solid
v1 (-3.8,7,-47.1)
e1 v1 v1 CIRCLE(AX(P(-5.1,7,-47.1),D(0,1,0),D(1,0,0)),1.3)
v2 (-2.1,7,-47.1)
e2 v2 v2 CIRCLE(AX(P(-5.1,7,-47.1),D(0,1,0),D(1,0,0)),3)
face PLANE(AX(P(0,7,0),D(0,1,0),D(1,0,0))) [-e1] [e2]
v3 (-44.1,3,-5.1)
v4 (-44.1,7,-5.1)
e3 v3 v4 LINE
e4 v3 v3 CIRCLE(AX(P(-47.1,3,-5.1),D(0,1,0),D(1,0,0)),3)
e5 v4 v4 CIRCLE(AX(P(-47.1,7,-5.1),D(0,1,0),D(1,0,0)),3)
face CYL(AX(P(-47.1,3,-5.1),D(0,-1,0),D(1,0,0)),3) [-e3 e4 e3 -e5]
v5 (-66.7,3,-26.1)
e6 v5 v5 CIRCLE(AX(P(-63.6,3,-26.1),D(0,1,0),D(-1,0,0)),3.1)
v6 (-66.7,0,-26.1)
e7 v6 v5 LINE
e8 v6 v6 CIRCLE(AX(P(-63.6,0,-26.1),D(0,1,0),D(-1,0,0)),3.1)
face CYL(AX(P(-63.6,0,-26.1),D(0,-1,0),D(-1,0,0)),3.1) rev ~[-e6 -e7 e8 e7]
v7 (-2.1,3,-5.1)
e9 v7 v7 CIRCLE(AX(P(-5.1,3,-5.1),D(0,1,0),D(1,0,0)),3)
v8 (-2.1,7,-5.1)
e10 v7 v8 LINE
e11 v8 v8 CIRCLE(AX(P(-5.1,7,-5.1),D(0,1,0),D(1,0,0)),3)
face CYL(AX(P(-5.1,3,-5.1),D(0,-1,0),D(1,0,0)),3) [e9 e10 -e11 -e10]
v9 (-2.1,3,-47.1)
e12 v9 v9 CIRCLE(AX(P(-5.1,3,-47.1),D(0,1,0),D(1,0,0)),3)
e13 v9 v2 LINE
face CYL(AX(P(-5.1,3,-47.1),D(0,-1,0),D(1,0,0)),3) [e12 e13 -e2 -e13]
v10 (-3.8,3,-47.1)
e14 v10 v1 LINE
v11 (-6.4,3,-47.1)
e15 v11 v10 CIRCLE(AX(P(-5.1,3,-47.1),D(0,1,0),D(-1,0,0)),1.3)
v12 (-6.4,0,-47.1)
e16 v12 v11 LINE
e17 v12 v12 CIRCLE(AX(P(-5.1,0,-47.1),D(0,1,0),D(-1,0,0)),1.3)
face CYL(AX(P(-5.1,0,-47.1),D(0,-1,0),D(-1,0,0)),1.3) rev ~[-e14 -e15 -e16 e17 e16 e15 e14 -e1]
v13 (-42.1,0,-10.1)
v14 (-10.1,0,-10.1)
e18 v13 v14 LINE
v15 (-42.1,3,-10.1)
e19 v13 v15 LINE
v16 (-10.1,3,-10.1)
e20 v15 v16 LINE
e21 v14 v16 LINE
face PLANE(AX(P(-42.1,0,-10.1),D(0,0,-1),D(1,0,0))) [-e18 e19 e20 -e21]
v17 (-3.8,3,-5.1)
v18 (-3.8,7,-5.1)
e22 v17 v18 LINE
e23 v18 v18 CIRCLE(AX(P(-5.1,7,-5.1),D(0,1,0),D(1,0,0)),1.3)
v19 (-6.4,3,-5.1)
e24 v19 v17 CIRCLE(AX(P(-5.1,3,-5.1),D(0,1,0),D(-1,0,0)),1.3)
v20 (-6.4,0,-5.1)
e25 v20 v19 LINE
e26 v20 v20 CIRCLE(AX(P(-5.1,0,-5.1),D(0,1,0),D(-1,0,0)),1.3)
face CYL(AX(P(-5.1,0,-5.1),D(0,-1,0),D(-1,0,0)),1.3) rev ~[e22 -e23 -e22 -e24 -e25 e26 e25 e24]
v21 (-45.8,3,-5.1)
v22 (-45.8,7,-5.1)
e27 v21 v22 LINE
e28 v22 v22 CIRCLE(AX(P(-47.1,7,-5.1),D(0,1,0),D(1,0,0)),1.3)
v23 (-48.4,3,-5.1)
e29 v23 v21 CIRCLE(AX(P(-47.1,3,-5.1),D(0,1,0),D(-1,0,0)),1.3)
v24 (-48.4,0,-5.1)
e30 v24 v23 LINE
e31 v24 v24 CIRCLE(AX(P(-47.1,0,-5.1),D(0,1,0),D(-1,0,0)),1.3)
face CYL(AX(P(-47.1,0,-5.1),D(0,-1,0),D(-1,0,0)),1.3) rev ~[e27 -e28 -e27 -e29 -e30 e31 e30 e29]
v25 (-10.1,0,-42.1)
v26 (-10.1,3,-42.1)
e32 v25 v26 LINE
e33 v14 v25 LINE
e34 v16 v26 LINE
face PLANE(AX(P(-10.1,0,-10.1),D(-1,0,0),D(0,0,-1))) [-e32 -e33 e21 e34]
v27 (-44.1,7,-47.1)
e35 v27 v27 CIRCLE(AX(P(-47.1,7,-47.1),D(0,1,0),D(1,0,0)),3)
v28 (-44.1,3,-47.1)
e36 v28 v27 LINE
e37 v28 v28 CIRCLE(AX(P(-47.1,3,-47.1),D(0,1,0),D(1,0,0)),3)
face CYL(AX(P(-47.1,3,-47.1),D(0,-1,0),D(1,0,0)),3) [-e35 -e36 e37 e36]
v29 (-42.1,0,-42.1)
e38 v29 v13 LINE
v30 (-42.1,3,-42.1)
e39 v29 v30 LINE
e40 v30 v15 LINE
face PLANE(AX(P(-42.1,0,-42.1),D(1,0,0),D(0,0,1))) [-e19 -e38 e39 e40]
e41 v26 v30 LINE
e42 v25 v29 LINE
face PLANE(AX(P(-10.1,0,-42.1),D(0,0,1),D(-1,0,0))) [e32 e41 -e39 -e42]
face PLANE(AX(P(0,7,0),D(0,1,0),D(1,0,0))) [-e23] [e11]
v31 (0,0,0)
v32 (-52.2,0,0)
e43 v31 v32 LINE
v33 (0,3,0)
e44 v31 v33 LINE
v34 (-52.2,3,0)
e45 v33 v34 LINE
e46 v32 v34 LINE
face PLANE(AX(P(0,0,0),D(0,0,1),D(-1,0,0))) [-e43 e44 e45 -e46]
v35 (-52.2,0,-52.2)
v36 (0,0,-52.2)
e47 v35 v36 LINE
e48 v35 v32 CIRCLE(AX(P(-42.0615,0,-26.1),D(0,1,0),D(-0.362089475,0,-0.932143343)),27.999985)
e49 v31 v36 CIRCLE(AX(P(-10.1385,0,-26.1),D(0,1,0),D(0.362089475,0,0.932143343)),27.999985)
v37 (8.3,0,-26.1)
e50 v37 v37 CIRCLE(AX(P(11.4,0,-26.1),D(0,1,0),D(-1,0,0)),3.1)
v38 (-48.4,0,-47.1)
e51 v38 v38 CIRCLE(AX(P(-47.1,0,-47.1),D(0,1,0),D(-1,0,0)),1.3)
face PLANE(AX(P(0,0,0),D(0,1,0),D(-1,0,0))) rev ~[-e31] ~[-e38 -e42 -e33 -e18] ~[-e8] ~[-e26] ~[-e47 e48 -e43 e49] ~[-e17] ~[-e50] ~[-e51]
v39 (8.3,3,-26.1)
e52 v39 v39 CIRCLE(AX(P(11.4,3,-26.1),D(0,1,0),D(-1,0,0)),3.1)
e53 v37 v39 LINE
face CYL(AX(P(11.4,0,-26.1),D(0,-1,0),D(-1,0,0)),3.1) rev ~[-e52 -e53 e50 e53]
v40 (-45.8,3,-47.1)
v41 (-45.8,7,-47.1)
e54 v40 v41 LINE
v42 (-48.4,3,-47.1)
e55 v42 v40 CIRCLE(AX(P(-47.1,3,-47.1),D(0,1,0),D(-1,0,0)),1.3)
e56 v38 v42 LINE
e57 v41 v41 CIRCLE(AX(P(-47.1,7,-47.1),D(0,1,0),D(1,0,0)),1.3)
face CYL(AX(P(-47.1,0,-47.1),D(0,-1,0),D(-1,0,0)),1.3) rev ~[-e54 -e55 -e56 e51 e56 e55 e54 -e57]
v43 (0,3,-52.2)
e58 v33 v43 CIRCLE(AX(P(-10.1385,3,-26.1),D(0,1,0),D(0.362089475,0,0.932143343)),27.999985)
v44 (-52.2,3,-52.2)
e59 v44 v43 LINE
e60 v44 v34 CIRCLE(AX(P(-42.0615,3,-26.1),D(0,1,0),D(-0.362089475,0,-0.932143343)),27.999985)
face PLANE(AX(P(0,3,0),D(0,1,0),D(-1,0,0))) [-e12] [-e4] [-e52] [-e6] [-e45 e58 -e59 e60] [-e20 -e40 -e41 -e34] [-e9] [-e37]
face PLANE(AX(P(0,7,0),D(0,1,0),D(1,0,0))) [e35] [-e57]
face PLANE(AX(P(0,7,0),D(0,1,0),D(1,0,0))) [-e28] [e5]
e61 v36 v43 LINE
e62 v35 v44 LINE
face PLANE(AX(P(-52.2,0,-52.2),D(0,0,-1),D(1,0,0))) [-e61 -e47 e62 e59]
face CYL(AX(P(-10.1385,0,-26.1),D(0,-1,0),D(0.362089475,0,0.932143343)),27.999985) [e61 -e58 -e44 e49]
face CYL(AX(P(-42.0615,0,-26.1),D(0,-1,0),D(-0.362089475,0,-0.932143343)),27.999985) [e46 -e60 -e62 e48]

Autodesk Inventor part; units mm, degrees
ref_plane "YZ Plane" through (0, 0, 0) normal (1, 0, 0) x (0, 1, 0)
ref_plane "XZ Plane" through (0, 0, 0) normal (0, 1, 0) x (-1, 0, 0)
ref_plane "XY Plane" through (0, 0, 0) normal (0, 0, 1) x (1, 0, 0)
sketch "Sketch1" plane through (0, 0, 0) normal (0, 1, 0) x (-1, 0, 0)
  line L0 (0, 0) -> (52.2, 0)
  line L1 (52.2, 0) -> (52.2, -52.2)
  line L2 (52.2, -52.2) -> (0, -52.2)
  line L3 (0, -52.2) -> (0, 0)
  circle A0 centre (47.1, -47.1) radius 1.3
  circle A1 centre (5.1, -5.1) radius 1.3
  circle A2 centre (5.1, -47.1) radius 1.3
  line L4 (0, 0) -> (52.2, -52.2) construction
  line L5 (52.2, 0) -> (0, -52.2) construction
  line L6 (5.1, -5.1) -> (47.1, -47.1) construction
  circle A3 centre (47.1, -5.1) radius 1.3
  circle A4 centre (63.6, -26.1) radius 3.1
  circle A5 centre (-11.4, -26.1) radius 3.1
  arc A6 (52.2, -52.2) -> (52.2, 0) centre (42.0615, -26.1) ccw
  arc A7 (0, 0) -> (0, -52.2) centre (10.1385, -26.1) ccw
  line L7 (10.1, -10.1) -> (10.1, -42.1)
  line L8 (10.1, -42.1) -> (42.1, -42.1)
  line L9 (42.1, -42.1) -> (42.1, -10.1)
  line L10 (42.1, -10.1) -> (10.1, -10.1)
  line L11 (10.1, -10.1) -> (42.1, -42.1) construction
  line L12 (10.1, -42.1) -> (42.1, -10.1) construction
  point P0 (26.1, -26.1)
  point P1 (26.1, -26.1)
  dimension "d1" = 42
  dimension "d2" = 42
  dimension "d3" = 2.6
  dimension "d4" = 2.6
  dimension "d5" = 2.6
  dimension "d18" = 52.2
  dimension "d19" = 52.2
  dimension "d24" = 2.6
  dimension "d26" = 6.2
  dimension "d27" = 6.2
  dimension "d28" = 75
  dimension "d29" = 37.5
  dimension "d30" = 28
  dimension "d31" = 28
  dimension "d32" = 32
  dimension "d33" = 32
extrude "Extrusion1" add sketch "Sketch1" along normal blind 3
sketch "Sketch2" plane through (0, 3, 0) normal (0, 1, 0) x (1, 0, 0)
  circle A0 centre (-5.1, 5.1) radius 1.3 projected
  circle A1 centre (-5.1, 5.1) radius 3
  circle A2 centre (-5.1, 47.1) radius 1.3 projected
  circle A3 centre (-5.1, 47.1) radius 3
  circle A4 centre (-47.1, 47.1) radius 1.3 projected
  circle A5 centre (-47.1, 47.1) radius 3
  circle A6 centre (-47.1, 5.1) radius 1.3 projected
  circle A7 centre (-47.1, 5.1) radius 3
  point P0 (0, 0)
  dimension "d12" = 6
  dimension "d13" = 6
  dimension "d14" = 6
  dimension "d25" = 6
extrude "Extrusion2" add sketch "Sketch2" along normal blind 4
equation "\"d4\" = d3"
equation "\"d5\" = d3"
equation "\"d19\" = d18"
equation "\"d24\" = d3"
equation "\"d27\" = d26"
equation "\"d29\" = 0.5 * d28"
equation "\"d33\" = d32"
equation "\"d13\" = d12"
equation "\"d14\" = d12"
equation "\"d25\" = d12"
equation "\"d7\" = d8"
equation "\"d8\" = 3"
properties part number "ephys_board_rack"
